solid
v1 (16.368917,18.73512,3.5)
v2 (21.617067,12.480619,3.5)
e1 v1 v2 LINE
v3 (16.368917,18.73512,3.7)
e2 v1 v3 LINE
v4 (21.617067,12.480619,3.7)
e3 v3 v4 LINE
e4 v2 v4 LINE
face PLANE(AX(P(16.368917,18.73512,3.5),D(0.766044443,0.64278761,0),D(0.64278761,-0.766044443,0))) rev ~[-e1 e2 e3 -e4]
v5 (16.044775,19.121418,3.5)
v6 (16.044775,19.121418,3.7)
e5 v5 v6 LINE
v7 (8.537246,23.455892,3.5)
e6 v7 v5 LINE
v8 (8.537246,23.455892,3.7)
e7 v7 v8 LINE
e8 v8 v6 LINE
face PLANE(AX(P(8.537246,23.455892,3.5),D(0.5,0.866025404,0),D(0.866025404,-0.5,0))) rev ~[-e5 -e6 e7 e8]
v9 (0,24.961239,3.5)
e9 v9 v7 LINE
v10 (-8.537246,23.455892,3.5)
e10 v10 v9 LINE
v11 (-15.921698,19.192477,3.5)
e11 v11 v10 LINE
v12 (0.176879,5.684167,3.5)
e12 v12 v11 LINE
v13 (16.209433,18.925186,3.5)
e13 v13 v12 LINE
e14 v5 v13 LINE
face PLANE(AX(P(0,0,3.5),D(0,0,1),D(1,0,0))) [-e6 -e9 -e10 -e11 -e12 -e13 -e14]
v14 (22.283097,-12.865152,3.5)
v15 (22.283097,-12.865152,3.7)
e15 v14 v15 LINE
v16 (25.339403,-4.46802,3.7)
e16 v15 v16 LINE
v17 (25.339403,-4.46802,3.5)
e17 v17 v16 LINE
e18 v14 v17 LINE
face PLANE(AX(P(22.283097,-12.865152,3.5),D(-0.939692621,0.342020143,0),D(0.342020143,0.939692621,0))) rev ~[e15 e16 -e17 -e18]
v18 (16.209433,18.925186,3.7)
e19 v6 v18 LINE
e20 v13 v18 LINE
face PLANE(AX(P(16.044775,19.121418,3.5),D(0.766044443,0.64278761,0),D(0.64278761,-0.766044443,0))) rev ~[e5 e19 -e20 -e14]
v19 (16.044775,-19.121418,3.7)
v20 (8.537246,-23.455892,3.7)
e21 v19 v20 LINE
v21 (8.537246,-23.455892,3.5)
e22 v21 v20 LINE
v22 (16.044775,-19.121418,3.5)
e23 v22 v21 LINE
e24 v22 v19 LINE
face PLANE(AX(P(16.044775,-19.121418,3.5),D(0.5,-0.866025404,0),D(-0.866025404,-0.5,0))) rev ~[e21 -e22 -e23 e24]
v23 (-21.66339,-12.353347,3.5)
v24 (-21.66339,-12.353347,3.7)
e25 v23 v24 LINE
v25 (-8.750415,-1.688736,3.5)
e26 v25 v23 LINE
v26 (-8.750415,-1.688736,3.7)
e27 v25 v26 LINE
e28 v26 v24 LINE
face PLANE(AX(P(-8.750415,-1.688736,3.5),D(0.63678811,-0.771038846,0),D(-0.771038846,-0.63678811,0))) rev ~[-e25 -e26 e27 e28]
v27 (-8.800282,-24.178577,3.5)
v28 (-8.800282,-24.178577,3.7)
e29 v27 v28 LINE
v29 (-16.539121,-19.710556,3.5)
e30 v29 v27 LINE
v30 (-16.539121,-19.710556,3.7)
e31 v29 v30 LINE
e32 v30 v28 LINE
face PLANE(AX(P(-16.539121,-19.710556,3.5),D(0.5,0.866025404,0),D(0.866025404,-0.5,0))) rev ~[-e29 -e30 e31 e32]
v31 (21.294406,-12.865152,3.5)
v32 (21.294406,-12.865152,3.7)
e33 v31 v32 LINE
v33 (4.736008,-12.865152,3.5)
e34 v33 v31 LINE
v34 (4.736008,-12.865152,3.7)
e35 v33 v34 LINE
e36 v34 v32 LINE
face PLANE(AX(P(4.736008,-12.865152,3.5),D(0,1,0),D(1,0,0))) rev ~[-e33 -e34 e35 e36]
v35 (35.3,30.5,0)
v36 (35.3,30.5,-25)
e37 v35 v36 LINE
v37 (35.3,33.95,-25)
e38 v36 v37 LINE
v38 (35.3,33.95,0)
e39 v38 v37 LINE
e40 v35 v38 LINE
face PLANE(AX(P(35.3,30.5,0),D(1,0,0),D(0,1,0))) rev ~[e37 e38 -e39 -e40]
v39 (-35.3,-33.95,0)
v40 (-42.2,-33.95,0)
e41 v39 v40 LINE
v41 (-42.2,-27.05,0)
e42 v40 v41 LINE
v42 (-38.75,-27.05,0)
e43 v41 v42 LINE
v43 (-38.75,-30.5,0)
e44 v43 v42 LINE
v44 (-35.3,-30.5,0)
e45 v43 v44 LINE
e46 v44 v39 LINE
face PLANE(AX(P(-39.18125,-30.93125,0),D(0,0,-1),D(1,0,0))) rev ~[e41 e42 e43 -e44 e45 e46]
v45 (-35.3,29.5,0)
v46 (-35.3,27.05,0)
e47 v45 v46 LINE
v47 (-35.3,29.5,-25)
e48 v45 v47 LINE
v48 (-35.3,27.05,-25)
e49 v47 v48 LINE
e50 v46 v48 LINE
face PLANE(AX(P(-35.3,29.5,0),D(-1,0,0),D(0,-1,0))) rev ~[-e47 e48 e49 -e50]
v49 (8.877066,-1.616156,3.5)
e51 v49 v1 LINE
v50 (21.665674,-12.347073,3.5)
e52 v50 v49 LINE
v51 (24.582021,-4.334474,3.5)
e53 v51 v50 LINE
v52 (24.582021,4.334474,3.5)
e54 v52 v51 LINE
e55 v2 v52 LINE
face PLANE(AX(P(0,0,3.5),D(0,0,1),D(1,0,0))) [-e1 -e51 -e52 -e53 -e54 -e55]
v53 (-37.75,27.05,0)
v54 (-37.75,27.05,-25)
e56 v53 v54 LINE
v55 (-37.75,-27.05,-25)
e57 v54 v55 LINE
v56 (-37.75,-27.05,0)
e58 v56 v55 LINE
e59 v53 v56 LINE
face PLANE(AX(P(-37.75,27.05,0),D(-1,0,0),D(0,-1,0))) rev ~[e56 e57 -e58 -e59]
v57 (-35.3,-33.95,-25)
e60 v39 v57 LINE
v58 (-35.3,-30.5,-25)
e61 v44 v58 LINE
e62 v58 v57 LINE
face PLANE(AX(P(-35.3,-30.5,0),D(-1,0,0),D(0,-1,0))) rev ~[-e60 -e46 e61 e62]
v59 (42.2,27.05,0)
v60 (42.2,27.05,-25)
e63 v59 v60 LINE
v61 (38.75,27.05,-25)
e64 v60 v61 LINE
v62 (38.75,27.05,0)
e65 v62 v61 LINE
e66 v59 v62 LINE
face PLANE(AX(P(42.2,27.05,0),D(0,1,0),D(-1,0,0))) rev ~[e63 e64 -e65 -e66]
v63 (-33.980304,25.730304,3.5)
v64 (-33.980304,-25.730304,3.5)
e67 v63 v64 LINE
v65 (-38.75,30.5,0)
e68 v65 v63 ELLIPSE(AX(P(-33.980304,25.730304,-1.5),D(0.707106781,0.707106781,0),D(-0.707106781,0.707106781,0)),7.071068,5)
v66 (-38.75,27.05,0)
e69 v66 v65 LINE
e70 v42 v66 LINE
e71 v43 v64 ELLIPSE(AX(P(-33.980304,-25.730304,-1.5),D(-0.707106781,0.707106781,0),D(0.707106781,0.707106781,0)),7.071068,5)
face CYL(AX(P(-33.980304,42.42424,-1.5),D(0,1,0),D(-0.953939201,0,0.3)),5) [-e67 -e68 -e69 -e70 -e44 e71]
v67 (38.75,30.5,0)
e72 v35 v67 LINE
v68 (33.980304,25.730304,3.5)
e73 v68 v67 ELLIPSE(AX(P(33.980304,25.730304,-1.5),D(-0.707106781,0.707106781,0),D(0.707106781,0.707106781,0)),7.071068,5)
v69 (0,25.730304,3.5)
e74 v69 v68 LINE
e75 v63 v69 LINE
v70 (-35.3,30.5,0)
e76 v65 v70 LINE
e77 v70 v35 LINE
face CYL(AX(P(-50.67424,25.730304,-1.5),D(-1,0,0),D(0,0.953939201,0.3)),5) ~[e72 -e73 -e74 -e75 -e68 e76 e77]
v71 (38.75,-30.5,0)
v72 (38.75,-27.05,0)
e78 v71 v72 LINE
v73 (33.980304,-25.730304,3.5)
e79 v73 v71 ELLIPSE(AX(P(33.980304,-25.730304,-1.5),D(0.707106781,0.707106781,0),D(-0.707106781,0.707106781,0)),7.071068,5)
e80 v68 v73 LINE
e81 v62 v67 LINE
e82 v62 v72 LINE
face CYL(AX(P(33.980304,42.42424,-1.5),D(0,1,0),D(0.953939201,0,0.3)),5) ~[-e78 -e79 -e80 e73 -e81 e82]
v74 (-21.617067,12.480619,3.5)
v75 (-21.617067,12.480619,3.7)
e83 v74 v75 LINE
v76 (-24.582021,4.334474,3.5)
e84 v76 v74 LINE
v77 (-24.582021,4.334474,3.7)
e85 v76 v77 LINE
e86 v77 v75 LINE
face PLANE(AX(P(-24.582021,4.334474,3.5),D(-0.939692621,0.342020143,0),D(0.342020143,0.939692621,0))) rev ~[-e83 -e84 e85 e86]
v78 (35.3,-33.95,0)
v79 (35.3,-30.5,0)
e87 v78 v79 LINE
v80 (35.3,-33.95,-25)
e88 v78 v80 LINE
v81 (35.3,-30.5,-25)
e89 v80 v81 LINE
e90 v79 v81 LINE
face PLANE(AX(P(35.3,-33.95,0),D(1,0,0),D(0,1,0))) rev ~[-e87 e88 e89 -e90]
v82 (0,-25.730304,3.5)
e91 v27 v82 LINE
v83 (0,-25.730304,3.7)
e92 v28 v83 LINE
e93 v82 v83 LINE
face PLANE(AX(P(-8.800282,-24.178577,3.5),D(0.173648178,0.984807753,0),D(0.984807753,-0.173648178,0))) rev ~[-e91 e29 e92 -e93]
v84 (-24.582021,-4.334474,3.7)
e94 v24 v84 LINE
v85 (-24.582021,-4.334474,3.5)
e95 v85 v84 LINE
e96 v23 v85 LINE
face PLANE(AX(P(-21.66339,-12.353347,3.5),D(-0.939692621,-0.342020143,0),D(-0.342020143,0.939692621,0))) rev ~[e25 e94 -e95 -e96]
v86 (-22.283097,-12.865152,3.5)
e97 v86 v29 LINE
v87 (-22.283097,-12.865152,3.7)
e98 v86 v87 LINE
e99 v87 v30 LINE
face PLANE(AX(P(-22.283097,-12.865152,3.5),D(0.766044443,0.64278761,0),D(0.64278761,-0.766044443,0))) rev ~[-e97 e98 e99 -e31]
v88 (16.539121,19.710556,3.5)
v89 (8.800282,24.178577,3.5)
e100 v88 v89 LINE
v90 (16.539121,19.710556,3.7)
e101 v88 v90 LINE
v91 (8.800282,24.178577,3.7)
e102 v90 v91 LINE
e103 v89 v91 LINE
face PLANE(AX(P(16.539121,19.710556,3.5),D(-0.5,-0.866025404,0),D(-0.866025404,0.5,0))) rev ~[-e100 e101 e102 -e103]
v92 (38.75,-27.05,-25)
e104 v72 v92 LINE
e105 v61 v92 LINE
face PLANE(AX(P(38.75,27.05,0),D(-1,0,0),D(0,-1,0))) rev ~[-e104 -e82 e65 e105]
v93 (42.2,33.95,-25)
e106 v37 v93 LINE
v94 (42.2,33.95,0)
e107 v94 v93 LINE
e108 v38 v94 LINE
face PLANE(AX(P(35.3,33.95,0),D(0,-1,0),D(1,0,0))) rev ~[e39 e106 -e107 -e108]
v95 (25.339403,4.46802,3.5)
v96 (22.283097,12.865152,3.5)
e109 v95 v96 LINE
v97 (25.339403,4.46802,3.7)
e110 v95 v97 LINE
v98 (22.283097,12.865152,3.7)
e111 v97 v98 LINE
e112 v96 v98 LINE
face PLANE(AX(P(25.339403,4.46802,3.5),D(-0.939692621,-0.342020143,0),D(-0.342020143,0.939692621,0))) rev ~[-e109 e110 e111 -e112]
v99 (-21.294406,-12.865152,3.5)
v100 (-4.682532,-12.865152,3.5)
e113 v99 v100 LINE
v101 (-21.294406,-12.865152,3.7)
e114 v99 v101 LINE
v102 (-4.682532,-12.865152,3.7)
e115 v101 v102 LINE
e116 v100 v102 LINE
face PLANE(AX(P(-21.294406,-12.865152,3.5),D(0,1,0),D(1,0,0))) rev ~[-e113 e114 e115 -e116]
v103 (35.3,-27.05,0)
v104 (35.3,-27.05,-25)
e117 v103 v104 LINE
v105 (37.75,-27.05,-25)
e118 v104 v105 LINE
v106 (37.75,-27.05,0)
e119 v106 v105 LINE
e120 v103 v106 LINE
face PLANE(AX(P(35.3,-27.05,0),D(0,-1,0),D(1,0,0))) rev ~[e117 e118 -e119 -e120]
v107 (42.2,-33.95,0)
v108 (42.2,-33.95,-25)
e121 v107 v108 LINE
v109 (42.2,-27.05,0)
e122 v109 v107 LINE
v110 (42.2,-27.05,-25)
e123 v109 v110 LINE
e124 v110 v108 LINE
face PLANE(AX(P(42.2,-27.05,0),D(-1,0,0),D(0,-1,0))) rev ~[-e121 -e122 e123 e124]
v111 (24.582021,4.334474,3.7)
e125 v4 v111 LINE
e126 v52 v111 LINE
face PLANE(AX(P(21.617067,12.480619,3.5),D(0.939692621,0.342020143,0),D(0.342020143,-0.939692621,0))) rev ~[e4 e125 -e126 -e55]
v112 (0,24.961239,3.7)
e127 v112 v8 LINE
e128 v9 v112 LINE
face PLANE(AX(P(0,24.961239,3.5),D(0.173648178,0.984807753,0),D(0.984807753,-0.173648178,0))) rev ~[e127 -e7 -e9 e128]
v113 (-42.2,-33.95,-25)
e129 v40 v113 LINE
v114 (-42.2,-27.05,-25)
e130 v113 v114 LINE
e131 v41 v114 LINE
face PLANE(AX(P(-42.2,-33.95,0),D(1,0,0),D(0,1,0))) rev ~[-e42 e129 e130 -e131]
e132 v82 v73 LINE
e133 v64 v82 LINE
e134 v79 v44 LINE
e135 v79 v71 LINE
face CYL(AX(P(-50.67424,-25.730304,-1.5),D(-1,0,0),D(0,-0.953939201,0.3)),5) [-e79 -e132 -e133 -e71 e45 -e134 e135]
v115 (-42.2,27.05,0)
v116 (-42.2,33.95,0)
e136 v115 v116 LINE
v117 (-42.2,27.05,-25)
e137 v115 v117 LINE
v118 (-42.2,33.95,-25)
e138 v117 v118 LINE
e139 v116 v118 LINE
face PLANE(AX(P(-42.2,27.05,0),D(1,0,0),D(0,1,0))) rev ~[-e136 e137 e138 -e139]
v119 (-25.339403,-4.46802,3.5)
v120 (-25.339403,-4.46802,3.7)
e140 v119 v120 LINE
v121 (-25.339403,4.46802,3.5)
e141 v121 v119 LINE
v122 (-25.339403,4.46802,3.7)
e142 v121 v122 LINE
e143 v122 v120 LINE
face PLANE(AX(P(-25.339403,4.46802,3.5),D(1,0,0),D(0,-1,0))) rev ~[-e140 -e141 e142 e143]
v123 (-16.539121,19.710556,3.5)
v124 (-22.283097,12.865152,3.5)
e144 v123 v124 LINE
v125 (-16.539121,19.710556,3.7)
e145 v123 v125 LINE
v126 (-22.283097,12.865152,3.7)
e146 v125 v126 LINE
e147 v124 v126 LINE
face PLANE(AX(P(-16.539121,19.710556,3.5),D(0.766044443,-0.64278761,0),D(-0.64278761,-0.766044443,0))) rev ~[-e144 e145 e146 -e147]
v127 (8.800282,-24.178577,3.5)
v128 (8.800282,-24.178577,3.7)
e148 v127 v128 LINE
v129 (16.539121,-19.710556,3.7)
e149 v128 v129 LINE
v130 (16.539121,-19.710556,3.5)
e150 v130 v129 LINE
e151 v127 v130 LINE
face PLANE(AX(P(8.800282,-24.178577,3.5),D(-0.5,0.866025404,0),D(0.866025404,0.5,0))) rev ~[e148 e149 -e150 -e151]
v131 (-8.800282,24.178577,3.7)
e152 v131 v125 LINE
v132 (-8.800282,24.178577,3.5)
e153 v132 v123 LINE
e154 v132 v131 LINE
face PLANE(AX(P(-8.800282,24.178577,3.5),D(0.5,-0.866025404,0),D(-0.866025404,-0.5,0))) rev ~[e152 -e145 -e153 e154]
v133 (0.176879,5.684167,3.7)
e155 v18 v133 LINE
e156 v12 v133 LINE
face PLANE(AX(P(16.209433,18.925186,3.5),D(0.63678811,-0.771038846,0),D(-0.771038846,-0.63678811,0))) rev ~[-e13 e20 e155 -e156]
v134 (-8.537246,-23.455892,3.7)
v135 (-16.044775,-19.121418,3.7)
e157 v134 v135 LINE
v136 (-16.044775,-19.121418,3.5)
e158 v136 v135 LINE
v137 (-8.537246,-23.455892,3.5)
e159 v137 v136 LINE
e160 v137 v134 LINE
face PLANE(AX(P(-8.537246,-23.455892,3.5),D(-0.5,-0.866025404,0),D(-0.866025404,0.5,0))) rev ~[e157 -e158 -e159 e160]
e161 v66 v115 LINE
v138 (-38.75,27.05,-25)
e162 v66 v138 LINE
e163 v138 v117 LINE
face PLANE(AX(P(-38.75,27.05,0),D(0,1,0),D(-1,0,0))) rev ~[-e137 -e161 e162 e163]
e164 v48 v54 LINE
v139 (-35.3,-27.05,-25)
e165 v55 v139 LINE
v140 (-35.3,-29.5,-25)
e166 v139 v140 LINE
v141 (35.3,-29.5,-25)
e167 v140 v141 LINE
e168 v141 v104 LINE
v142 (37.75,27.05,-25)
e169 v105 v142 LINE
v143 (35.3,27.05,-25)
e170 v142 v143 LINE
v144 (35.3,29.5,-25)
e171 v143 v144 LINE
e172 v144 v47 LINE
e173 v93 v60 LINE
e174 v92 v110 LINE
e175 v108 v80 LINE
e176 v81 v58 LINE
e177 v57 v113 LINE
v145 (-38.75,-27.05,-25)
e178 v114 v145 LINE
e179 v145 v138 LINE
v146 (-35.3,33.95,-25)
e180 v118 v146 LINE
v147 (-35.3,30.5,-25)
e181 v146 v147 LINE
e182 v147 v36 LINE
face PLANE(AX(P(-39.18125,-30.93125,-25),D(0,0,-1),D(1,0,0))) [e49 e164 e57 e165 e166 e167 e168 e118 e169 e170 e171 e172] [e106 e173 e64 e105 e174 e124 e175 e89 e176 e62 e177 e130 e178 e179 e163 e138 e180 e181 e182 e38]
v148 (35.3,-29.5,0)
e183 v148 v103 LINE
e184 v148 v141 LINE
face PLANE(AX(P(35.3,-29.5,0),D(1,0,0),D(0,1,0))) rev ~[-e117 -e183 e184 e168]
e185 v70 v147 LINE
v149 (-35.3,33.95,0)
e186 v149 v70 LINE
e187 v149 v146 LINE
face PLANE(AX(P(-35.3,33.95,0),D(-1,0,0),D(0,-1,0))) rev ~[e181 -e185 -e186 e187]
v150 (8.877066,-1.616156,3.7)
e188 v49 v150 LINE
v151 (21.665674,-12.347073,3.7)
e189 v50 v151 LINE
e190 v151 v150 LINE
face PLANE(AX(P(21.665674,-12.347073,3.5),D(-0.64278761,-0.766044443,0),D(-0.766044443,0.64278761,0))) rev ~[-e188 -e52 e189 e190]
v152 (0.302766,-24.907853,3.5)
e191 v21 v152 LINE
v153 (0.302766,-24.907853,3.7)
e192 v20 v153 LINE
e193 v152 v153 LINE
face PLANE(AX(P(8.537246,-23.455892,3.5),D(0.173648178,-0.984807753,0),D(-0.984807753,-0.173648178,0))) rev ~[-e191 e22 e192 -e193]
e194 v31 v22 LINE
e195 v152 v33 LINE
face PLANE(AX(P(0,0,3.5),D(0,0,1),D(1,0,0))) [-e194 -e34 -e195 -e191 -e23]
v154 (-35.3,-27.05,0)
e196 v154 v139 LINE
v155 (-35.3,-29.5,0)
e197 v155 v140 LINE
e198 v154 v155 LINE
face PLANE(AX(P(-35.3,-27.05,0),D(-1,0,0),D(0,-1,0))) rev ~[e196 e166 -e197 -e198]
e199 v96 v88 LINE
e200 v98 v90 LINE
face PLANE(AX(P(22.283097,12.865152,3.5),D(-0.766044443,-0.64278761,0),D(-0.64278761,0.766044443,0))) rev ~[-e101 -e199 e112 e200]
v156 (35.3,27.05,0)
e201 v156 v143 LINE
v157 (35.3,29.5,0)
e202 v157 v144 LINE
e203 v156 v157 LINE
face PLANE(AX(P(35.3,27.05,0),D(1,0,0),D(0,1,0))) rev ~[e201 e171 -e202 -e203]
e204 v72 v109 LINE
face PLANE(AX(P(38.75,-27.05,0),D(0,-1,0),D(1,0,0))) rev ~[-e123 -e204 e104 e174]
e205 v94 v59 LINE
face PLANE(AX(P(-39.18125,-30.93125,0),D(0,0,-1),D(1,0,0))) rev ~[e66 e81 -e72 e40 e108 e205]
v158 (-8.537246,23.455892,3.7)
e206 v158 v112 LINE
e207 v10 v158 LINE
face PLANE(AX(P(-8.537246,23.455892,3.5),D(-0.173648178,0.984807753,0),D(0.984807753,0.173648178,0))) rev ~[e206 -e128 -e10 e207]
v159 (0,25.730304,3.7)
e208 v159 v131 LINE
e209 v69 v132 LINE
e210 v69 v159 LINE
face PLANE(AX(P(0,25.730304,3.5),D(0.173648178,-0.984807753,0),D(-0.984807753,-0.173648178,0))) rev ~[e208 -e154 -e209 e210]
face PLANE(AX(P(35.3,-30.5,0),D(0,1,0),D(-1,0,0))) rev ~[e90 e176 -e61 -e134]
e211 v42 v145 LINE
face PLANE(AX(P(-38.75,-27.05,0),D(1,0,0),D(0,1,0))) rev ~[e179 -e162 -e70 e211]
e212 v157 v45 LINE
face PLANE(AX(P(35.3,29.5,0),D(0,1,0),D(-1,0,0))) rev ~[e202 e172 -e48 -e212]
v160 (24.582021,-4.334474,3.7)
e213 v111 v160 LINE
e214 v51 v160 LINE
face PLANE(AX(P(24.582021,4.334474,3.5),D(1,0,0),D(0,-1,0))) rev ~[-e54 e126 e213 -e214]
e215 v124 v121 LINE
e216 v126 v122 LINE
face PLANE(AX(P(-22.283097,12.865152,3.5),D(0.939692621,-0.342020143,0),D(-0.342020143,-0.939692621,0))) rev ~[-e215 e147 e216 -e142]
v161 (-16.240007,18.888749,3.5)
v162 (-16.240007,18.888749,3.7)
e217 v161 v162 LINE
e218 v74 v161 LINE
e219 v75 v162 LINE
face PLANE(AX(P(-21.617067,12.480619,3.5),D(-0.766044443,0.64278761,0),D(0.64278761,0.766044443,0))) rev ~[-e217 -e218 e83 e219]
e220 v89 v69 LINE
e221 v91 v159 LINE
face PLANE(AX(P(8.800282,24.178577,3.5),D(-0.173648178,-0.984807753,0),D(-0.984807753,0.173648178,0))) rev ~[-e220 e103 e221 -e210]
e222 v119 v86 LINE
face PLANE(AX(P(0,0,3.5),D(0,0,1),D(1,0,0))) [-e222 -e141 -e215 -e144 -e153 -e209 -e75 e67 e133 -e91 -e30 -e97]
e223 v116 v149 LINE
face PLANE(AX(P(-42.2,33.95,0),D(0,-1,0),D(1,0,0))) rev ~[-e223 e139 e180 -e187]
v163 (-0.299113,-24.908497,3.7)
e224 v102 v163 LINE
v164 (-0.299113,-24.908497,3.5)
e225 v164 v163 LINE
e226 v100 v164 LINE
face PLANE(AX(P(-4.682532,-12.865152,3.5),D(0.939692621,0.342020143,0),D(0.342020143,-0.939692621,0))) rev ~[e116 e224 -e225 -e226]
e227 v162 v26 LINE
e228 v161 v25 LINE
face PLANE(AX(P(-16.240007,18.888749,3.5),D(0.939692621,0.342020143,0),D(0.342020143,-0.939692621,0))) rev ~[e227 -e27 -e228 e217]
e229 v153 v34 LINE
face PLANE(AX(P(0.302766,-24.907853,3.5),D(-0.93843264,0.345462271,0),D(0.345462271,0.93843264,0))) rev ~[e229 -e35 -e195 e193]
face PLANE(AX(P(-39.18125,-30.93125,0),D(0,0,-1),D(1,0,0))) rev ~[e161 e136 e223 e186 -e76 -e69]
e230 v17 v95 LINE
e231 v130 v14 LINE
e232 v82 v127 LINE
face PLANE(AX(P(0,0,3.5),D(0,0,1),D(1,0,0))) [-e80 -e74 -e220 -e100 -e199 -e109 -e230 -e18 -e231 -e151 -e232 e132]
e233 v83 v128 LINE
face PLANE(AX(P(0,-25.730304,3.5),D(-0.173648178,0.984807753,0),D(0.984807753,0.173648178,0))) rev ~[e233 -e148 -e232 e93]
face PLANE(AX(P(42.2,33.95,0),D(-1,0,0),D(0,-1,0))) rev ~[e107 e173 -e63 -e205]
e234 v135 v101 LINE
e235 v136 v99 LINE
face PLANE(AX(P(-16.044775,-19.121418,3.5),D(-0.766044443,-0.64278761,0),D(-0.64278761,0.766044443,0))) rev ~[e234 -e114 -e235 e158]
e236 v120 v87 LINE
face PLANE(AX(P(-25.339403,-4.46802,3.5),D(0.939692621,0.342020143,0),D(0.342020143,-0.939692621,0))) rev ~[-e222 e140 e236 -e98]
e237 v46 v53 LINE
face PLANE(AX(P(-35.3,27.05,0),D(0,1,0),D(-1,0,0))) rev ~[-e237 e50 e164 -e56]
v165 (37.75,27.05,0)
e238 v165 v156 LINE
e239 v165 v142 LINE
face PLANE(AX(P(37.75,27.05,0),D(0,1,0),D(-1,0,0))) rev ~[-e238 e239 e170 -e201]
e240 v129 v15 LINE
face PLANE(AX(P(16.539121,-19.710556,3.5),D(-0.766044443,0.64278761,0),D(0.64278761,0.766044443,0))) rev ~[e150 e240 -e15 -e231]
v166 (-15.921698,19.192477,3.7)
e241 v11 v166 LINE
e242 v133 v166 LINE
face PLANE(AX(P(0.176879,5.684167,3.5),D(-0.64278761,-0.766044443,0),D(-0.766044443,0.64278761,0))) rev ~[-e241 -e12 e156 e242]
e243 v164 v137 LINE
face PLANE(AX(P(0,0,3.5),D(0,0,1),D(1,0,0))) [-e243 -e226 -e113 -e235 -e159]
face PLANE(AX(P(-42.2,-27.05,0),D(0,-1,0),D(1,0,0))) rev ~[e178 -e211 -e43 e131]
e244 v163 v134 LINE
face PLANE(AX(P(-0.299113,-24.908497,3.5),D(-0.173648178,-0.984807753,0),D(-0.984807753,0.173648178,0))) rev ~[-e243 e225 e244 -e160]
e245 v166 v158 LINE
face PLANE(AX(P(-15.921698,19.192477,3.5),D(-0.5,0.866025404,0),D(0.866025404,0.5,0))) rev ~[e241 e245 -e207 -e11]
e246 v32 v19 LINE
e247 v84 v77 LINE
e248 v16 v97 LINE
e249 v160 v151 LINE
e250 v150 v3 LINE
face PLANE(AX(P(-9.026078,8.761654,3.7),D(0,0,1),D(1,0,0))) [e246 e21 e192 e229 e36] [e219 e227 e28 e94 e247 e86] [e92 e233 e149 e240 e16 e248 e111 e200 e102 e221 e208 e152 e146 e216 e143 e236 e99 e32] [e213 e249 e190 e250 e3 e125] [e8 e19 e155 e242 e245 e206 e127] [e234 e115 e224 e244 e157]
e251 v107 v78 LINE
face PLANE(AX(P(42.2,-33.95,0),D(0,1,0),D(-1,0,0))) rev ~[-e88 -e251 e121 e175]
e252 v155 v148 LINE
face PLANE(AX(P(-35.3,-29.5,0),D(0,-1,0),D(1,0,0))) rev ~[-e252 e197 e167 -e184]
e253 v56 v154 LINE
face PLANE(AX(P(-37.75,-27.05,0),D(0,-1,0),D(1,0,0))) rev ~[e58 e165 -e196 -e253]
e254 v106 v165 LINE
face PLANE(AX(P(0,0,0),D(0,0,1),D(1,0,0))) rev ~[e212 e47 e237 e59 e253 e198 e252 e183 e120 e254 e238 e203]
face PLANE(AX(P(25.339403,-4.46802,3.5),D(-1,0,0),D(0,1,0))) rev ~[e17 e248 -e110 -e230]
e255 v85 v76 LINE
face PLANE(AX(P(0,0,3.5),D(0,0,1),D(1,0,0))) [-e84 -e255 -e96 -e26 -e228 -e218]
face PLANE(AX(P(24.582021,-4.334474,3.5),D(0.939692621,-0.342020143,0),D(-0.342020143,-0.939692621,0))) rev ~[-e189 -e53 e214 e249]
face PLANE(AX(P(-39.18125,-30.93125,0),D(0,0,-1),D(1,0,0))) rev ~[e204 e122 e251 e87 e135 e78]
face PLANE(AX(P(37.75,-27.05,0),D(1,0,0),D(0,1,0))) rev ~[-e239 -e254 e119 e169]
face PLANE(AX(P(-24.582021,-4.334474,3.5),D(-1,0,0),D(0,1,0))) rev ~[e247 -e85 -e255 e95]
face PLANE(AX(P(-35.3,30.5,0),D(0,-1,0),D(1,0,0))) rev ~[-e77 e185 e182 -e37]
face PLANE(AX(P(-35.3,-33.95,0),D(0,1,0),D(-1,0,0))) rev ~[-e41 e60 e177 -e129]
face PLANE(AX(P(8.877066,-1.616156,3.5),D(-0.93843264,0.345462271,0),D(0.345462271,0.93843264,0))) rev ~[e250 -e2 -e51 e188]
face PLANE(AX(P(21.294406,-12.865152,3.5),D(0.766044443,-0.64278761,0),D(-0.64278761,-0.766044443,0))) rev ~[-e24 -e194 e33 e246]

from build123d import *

# Parameters (mm, degrees)
F0_W        = 77.5
F0_H        = 61
F1_DEPTH    = 3.5
F2_T1_DEPTH = 84.8484800354
F2_T3_DEPTH = 101.3484800354
F5_DEPTH    = 25
F6_DEPTH    = 0.2


# Not quite as in the source:
# - a fillet or chamfer that OpenCascade refuses, or shapes differently, is made with other operations: its cross-section is extruded or revolved along the edge and cut away or added


with BuildPart() as f1:
    # F0 (on Top) → F1 (new body)
    with BuildSketch(Plane.XY):
        Rectangle(F0_W, F0_H)
    extrude(amount=F1_DEPTH)

    # F2: fillet of radius 5 on 4 edges, made by hand

    # F2_s2 → F2_t1 (cut)
    with BuildSketch(Plane.XZ.offset(-42.4242400177)):
        with BuildLine():
            ThreePointArc((38.75, 0), (36.9383438845, 2.5311288741), (33.9803039929, 3.5))
            Line((33.9803039929, 3.5), (38.75, 3.5))
            Line((38.75, 3.5), (38.75, 0))
        make_face()
        with BuildLine():
            ThreePointArc((-38.75, 0), (-36.9383438845, 2.5311288741), (-33.9803039929, 3.5))
            Line((-33.9803039929, 3.5), (-38.75, 3.5))
            Line((-38.75, 3.5), (-38.75, 0))
        make_face()
    extrude(amount=F2_T1_DEPTH, mode=Mode.SUBTRACT)

    # F2_s4 → F2_t3 (cut)
    with BuildSketch(Plane.YZ.offset(-50.6742400177)):
        with BuildLine():
            ThreePointArc((30.5, 0), (28.6883438845, 2.5311288741), (25.7303039929, 3.5))
            Line((25.7303039929, 3.5), (30.5, 3.5))
            Line((30.5, 3.5), (30.5, 0))
        make_face()
        with BuildLine():
            ThreePointArc((-30.5, 0), (-28.6883438845, 2.5311288741), (-25.7303039929, 3.5))
            Line((-25.7303039929, 3.5), (-30.5, 3.5))
            Line((-30.5, 3.5), (-30.5, 0))
        make_face()
    extrude(amount=F2_T3_DEPTH, mode=Mode.SUBTRACT)

    # F4 (on face) → F5 (join)
    with BuildSketch(Plane(origin=(0, 0, 0), x_dir=(1, 0, 0), z_dir=(0, 0, -1))):
        Polygon((-38.75, 29.5), (-38.75, 30.5), (-37.75, 30.5), (-35.3, 30.5), (-35.3, 33.95), (-42.2, 33.95), (-42.2, 27.05), (-38.75, 27.05), align=None)
        Polygon((-37.75, 30.5), (-38.75, 30.5), (-38.75, 29.5), (-38.75, 27.05), (-38.75, -27.05), (-38.75, -29.5), (-38.75, -30.5), (-37.75, -30.5), (-35.3, -30.5), (35.3, -30.5), (37.75, -30.5), (38.75, -30.5), (38.75, -29.5), (38.75, -27.05), (38.75, 27.05), (38.75, 29.5), (38.75, 30.5), (37.75, 30.5), (35.3, 30.5), (-35.3, 30.5), align=None)
        Polygon((-35.3, 27.05), (-35.3, 29.5), (35.3, 29.5), (35.3, 27.05), (37.75, 27.05), (37.75, -27.05), (35.3, -27.05), (35.3, -29.5), (-35.3, -29.5), (-35.3, -27.05), (-37.75, -27.05), (-37.75, 27.05), align=None, mode=Mode.SUBTRACT)
        Polygon((35.3, 33.95), (35.3, 30.5), (37.75, 30.5), (38.75, 30.5), (38.75, 29.5), (38.75, 27.05), (42.2, 27.05), (42.2, 33.95), align=None)
        Polygon((-38.75, -29.5), (-38.75, -27.05), (-42.2, -27.05), (-42.2, -33.95), (-35.3, -33.95), (-35.3, -30.5), (-37.75, -30.5), (-38.75, -30.5), align=None)
        Polygon((42.2, -27.05), (38.75, -27.05), (38.75, -29.5), (38.75, -30.5), (37.75, -30.5), (35.3, -30.5), (35.3, -33.95), (42.2, -33.95), align=None)
    extrude(amount=F5_DEPTH)

    # F3 (on face) → F6 (join)
    with BuildSketch(Plane.XY.offset(3.5)):
        Polygon((-16.2400073105, 18.8887493843), (-8.7504151188, -1.6887360431), (0.1768791019, 5.6841672089), (-15.9216975961, 19.1924769786), (-16.0447749761, 19.1214182202), align=None)
        Polygon((-21.294405657, -12.8651519965), (-4.682532386, -12.8651519965), (-8.7504151188, -1.6887360431), (-21.6633903185, -12.3533466729), (-21.6170668475, -12.4806193635), align=None)
        Polygon((-4.682532386, -12.8651519965), (-0.2991132897, -24.9084969837), (0, -24.961238727), (0.3027663667, -24.9078528477), (4.7360081498, -12.8651519965), align=None)
        Polygon((8.8770657691, -1.6161562148), (4.7360081498, -12.8651519965), (21.294405657, -12.8651519965), (21.6170668475, -12.4806193635), (21.665673901, -12.3470725815), align=None)
        Polygon((0.1768791019, 5.6841672089), (8.8770657691, -1.6161562148), (16.3689174848, 18.7351202209), (16.20943331, 18.9251860592), align=None)
        Polygon((-25.3394028596, -4.4680203992), (-22.283096905, -12.8651519965), (-21.6633903185, -12.3533466729), (-24.5820214231, -4.3344736172), (-24.5820214231, 4.3344736172), (-21.6170668475, 12.4806193635), (-16.2400073105, 18.8887493843), (-16.5391206001, 19.7105563935), (-22.283096905, 12.8651519965), (-25.3394028596, 4.4680203992), align=None)
        Polygon((0.3027663667, -24.9078528477), (0, -25.7303039929), (8.8002822595, -24.1785767927), (16.5391206001, -19.7105563935), (22.283096905, -12.8651519965), (21.294405657, -12.8651519965), (16.0447749761, -19.1214182202), (8.537246447, -23.4558918374), align=None)
        Polygon((-8.8002822595, -24.1785767927), (0, -25.7303039929), (-0.2991132897, -24.9084969837), (-8.537246447, -23.4558918374), (-16.0447749761, -19.1214182202), (-21.294405657, -12.8651519965), (-22.283096905, -12.8651519965), (-16.5391206001, -19.7105563935), align=None)
        Polygon((-22.283096905, -12.8651519965), (-21.294405657, -12.8651519965), (-21.6170668475, -12.4806193635), (-21.6633903185, -12.3533466729), align=None)
        Polygon((-16.5391206001, 19.7105563935), (-16.2400073105, 18.8887493843), (-16.0447749761, 19.1214182202), (-15.9216975961, 19.1924769786), align=None)
        Polygon((21.665673901, -12.3470725815), (22.283096905, -12.8651519965), (25.3394028596, -4.4680203992), (25.3394028596, 4.4680203992), (22.283096905, 12.8651519965), (16.5391206001, 19.7105563935), (8.8002822595, 24.1785767927), (0, 25.7303039929), (-8.8002822595, 24.1785767927), (-16.5391206001, 19.7105563935), (-15.9216975961, 19.1924769786), (-8.537246447, 23.4558918374), (0, 24.961238727), (8.537246447, 23.4558918374), (16.0447749761, 19.1214182202), (16.20943331, 18.9251860592), (16.5391206001, 19.1974692878), (16.3689174848, 18.7351202209), (21.6170668475, 12.4806193635), (24.5820214231, 4.3344736172), (24.5820214231, -4.3344736172), align=None)
        Polygon((16.20943331, 18.9251860592), (16.3689174848, 18.7351202209), (16.5391206001, 19.1974692878), align=None)
        Polygon((21.6170668475, -12.4806193635), (21.294405657, -12.8651519965), (22.283096905, -12.8651519965), (21.665673901, -12.3470725815), align=None)
        Polygon((-0.2991132897, -24.9084969837), (0, -25.7303039929), (0.3027663667, -24.9078528477), (0, -24.961238727), align=None)
        Polygon((-8.7504151188, -1.6887360431), (-4.682532386, -12.8651519965), (4.7360081498, -12.8651519965), (8.8770657691, -1.6161562148), (0.1768791019, 5.6841672089), align=None)
    extrude(amount=F6_DEPTH)


solid = f1.part
